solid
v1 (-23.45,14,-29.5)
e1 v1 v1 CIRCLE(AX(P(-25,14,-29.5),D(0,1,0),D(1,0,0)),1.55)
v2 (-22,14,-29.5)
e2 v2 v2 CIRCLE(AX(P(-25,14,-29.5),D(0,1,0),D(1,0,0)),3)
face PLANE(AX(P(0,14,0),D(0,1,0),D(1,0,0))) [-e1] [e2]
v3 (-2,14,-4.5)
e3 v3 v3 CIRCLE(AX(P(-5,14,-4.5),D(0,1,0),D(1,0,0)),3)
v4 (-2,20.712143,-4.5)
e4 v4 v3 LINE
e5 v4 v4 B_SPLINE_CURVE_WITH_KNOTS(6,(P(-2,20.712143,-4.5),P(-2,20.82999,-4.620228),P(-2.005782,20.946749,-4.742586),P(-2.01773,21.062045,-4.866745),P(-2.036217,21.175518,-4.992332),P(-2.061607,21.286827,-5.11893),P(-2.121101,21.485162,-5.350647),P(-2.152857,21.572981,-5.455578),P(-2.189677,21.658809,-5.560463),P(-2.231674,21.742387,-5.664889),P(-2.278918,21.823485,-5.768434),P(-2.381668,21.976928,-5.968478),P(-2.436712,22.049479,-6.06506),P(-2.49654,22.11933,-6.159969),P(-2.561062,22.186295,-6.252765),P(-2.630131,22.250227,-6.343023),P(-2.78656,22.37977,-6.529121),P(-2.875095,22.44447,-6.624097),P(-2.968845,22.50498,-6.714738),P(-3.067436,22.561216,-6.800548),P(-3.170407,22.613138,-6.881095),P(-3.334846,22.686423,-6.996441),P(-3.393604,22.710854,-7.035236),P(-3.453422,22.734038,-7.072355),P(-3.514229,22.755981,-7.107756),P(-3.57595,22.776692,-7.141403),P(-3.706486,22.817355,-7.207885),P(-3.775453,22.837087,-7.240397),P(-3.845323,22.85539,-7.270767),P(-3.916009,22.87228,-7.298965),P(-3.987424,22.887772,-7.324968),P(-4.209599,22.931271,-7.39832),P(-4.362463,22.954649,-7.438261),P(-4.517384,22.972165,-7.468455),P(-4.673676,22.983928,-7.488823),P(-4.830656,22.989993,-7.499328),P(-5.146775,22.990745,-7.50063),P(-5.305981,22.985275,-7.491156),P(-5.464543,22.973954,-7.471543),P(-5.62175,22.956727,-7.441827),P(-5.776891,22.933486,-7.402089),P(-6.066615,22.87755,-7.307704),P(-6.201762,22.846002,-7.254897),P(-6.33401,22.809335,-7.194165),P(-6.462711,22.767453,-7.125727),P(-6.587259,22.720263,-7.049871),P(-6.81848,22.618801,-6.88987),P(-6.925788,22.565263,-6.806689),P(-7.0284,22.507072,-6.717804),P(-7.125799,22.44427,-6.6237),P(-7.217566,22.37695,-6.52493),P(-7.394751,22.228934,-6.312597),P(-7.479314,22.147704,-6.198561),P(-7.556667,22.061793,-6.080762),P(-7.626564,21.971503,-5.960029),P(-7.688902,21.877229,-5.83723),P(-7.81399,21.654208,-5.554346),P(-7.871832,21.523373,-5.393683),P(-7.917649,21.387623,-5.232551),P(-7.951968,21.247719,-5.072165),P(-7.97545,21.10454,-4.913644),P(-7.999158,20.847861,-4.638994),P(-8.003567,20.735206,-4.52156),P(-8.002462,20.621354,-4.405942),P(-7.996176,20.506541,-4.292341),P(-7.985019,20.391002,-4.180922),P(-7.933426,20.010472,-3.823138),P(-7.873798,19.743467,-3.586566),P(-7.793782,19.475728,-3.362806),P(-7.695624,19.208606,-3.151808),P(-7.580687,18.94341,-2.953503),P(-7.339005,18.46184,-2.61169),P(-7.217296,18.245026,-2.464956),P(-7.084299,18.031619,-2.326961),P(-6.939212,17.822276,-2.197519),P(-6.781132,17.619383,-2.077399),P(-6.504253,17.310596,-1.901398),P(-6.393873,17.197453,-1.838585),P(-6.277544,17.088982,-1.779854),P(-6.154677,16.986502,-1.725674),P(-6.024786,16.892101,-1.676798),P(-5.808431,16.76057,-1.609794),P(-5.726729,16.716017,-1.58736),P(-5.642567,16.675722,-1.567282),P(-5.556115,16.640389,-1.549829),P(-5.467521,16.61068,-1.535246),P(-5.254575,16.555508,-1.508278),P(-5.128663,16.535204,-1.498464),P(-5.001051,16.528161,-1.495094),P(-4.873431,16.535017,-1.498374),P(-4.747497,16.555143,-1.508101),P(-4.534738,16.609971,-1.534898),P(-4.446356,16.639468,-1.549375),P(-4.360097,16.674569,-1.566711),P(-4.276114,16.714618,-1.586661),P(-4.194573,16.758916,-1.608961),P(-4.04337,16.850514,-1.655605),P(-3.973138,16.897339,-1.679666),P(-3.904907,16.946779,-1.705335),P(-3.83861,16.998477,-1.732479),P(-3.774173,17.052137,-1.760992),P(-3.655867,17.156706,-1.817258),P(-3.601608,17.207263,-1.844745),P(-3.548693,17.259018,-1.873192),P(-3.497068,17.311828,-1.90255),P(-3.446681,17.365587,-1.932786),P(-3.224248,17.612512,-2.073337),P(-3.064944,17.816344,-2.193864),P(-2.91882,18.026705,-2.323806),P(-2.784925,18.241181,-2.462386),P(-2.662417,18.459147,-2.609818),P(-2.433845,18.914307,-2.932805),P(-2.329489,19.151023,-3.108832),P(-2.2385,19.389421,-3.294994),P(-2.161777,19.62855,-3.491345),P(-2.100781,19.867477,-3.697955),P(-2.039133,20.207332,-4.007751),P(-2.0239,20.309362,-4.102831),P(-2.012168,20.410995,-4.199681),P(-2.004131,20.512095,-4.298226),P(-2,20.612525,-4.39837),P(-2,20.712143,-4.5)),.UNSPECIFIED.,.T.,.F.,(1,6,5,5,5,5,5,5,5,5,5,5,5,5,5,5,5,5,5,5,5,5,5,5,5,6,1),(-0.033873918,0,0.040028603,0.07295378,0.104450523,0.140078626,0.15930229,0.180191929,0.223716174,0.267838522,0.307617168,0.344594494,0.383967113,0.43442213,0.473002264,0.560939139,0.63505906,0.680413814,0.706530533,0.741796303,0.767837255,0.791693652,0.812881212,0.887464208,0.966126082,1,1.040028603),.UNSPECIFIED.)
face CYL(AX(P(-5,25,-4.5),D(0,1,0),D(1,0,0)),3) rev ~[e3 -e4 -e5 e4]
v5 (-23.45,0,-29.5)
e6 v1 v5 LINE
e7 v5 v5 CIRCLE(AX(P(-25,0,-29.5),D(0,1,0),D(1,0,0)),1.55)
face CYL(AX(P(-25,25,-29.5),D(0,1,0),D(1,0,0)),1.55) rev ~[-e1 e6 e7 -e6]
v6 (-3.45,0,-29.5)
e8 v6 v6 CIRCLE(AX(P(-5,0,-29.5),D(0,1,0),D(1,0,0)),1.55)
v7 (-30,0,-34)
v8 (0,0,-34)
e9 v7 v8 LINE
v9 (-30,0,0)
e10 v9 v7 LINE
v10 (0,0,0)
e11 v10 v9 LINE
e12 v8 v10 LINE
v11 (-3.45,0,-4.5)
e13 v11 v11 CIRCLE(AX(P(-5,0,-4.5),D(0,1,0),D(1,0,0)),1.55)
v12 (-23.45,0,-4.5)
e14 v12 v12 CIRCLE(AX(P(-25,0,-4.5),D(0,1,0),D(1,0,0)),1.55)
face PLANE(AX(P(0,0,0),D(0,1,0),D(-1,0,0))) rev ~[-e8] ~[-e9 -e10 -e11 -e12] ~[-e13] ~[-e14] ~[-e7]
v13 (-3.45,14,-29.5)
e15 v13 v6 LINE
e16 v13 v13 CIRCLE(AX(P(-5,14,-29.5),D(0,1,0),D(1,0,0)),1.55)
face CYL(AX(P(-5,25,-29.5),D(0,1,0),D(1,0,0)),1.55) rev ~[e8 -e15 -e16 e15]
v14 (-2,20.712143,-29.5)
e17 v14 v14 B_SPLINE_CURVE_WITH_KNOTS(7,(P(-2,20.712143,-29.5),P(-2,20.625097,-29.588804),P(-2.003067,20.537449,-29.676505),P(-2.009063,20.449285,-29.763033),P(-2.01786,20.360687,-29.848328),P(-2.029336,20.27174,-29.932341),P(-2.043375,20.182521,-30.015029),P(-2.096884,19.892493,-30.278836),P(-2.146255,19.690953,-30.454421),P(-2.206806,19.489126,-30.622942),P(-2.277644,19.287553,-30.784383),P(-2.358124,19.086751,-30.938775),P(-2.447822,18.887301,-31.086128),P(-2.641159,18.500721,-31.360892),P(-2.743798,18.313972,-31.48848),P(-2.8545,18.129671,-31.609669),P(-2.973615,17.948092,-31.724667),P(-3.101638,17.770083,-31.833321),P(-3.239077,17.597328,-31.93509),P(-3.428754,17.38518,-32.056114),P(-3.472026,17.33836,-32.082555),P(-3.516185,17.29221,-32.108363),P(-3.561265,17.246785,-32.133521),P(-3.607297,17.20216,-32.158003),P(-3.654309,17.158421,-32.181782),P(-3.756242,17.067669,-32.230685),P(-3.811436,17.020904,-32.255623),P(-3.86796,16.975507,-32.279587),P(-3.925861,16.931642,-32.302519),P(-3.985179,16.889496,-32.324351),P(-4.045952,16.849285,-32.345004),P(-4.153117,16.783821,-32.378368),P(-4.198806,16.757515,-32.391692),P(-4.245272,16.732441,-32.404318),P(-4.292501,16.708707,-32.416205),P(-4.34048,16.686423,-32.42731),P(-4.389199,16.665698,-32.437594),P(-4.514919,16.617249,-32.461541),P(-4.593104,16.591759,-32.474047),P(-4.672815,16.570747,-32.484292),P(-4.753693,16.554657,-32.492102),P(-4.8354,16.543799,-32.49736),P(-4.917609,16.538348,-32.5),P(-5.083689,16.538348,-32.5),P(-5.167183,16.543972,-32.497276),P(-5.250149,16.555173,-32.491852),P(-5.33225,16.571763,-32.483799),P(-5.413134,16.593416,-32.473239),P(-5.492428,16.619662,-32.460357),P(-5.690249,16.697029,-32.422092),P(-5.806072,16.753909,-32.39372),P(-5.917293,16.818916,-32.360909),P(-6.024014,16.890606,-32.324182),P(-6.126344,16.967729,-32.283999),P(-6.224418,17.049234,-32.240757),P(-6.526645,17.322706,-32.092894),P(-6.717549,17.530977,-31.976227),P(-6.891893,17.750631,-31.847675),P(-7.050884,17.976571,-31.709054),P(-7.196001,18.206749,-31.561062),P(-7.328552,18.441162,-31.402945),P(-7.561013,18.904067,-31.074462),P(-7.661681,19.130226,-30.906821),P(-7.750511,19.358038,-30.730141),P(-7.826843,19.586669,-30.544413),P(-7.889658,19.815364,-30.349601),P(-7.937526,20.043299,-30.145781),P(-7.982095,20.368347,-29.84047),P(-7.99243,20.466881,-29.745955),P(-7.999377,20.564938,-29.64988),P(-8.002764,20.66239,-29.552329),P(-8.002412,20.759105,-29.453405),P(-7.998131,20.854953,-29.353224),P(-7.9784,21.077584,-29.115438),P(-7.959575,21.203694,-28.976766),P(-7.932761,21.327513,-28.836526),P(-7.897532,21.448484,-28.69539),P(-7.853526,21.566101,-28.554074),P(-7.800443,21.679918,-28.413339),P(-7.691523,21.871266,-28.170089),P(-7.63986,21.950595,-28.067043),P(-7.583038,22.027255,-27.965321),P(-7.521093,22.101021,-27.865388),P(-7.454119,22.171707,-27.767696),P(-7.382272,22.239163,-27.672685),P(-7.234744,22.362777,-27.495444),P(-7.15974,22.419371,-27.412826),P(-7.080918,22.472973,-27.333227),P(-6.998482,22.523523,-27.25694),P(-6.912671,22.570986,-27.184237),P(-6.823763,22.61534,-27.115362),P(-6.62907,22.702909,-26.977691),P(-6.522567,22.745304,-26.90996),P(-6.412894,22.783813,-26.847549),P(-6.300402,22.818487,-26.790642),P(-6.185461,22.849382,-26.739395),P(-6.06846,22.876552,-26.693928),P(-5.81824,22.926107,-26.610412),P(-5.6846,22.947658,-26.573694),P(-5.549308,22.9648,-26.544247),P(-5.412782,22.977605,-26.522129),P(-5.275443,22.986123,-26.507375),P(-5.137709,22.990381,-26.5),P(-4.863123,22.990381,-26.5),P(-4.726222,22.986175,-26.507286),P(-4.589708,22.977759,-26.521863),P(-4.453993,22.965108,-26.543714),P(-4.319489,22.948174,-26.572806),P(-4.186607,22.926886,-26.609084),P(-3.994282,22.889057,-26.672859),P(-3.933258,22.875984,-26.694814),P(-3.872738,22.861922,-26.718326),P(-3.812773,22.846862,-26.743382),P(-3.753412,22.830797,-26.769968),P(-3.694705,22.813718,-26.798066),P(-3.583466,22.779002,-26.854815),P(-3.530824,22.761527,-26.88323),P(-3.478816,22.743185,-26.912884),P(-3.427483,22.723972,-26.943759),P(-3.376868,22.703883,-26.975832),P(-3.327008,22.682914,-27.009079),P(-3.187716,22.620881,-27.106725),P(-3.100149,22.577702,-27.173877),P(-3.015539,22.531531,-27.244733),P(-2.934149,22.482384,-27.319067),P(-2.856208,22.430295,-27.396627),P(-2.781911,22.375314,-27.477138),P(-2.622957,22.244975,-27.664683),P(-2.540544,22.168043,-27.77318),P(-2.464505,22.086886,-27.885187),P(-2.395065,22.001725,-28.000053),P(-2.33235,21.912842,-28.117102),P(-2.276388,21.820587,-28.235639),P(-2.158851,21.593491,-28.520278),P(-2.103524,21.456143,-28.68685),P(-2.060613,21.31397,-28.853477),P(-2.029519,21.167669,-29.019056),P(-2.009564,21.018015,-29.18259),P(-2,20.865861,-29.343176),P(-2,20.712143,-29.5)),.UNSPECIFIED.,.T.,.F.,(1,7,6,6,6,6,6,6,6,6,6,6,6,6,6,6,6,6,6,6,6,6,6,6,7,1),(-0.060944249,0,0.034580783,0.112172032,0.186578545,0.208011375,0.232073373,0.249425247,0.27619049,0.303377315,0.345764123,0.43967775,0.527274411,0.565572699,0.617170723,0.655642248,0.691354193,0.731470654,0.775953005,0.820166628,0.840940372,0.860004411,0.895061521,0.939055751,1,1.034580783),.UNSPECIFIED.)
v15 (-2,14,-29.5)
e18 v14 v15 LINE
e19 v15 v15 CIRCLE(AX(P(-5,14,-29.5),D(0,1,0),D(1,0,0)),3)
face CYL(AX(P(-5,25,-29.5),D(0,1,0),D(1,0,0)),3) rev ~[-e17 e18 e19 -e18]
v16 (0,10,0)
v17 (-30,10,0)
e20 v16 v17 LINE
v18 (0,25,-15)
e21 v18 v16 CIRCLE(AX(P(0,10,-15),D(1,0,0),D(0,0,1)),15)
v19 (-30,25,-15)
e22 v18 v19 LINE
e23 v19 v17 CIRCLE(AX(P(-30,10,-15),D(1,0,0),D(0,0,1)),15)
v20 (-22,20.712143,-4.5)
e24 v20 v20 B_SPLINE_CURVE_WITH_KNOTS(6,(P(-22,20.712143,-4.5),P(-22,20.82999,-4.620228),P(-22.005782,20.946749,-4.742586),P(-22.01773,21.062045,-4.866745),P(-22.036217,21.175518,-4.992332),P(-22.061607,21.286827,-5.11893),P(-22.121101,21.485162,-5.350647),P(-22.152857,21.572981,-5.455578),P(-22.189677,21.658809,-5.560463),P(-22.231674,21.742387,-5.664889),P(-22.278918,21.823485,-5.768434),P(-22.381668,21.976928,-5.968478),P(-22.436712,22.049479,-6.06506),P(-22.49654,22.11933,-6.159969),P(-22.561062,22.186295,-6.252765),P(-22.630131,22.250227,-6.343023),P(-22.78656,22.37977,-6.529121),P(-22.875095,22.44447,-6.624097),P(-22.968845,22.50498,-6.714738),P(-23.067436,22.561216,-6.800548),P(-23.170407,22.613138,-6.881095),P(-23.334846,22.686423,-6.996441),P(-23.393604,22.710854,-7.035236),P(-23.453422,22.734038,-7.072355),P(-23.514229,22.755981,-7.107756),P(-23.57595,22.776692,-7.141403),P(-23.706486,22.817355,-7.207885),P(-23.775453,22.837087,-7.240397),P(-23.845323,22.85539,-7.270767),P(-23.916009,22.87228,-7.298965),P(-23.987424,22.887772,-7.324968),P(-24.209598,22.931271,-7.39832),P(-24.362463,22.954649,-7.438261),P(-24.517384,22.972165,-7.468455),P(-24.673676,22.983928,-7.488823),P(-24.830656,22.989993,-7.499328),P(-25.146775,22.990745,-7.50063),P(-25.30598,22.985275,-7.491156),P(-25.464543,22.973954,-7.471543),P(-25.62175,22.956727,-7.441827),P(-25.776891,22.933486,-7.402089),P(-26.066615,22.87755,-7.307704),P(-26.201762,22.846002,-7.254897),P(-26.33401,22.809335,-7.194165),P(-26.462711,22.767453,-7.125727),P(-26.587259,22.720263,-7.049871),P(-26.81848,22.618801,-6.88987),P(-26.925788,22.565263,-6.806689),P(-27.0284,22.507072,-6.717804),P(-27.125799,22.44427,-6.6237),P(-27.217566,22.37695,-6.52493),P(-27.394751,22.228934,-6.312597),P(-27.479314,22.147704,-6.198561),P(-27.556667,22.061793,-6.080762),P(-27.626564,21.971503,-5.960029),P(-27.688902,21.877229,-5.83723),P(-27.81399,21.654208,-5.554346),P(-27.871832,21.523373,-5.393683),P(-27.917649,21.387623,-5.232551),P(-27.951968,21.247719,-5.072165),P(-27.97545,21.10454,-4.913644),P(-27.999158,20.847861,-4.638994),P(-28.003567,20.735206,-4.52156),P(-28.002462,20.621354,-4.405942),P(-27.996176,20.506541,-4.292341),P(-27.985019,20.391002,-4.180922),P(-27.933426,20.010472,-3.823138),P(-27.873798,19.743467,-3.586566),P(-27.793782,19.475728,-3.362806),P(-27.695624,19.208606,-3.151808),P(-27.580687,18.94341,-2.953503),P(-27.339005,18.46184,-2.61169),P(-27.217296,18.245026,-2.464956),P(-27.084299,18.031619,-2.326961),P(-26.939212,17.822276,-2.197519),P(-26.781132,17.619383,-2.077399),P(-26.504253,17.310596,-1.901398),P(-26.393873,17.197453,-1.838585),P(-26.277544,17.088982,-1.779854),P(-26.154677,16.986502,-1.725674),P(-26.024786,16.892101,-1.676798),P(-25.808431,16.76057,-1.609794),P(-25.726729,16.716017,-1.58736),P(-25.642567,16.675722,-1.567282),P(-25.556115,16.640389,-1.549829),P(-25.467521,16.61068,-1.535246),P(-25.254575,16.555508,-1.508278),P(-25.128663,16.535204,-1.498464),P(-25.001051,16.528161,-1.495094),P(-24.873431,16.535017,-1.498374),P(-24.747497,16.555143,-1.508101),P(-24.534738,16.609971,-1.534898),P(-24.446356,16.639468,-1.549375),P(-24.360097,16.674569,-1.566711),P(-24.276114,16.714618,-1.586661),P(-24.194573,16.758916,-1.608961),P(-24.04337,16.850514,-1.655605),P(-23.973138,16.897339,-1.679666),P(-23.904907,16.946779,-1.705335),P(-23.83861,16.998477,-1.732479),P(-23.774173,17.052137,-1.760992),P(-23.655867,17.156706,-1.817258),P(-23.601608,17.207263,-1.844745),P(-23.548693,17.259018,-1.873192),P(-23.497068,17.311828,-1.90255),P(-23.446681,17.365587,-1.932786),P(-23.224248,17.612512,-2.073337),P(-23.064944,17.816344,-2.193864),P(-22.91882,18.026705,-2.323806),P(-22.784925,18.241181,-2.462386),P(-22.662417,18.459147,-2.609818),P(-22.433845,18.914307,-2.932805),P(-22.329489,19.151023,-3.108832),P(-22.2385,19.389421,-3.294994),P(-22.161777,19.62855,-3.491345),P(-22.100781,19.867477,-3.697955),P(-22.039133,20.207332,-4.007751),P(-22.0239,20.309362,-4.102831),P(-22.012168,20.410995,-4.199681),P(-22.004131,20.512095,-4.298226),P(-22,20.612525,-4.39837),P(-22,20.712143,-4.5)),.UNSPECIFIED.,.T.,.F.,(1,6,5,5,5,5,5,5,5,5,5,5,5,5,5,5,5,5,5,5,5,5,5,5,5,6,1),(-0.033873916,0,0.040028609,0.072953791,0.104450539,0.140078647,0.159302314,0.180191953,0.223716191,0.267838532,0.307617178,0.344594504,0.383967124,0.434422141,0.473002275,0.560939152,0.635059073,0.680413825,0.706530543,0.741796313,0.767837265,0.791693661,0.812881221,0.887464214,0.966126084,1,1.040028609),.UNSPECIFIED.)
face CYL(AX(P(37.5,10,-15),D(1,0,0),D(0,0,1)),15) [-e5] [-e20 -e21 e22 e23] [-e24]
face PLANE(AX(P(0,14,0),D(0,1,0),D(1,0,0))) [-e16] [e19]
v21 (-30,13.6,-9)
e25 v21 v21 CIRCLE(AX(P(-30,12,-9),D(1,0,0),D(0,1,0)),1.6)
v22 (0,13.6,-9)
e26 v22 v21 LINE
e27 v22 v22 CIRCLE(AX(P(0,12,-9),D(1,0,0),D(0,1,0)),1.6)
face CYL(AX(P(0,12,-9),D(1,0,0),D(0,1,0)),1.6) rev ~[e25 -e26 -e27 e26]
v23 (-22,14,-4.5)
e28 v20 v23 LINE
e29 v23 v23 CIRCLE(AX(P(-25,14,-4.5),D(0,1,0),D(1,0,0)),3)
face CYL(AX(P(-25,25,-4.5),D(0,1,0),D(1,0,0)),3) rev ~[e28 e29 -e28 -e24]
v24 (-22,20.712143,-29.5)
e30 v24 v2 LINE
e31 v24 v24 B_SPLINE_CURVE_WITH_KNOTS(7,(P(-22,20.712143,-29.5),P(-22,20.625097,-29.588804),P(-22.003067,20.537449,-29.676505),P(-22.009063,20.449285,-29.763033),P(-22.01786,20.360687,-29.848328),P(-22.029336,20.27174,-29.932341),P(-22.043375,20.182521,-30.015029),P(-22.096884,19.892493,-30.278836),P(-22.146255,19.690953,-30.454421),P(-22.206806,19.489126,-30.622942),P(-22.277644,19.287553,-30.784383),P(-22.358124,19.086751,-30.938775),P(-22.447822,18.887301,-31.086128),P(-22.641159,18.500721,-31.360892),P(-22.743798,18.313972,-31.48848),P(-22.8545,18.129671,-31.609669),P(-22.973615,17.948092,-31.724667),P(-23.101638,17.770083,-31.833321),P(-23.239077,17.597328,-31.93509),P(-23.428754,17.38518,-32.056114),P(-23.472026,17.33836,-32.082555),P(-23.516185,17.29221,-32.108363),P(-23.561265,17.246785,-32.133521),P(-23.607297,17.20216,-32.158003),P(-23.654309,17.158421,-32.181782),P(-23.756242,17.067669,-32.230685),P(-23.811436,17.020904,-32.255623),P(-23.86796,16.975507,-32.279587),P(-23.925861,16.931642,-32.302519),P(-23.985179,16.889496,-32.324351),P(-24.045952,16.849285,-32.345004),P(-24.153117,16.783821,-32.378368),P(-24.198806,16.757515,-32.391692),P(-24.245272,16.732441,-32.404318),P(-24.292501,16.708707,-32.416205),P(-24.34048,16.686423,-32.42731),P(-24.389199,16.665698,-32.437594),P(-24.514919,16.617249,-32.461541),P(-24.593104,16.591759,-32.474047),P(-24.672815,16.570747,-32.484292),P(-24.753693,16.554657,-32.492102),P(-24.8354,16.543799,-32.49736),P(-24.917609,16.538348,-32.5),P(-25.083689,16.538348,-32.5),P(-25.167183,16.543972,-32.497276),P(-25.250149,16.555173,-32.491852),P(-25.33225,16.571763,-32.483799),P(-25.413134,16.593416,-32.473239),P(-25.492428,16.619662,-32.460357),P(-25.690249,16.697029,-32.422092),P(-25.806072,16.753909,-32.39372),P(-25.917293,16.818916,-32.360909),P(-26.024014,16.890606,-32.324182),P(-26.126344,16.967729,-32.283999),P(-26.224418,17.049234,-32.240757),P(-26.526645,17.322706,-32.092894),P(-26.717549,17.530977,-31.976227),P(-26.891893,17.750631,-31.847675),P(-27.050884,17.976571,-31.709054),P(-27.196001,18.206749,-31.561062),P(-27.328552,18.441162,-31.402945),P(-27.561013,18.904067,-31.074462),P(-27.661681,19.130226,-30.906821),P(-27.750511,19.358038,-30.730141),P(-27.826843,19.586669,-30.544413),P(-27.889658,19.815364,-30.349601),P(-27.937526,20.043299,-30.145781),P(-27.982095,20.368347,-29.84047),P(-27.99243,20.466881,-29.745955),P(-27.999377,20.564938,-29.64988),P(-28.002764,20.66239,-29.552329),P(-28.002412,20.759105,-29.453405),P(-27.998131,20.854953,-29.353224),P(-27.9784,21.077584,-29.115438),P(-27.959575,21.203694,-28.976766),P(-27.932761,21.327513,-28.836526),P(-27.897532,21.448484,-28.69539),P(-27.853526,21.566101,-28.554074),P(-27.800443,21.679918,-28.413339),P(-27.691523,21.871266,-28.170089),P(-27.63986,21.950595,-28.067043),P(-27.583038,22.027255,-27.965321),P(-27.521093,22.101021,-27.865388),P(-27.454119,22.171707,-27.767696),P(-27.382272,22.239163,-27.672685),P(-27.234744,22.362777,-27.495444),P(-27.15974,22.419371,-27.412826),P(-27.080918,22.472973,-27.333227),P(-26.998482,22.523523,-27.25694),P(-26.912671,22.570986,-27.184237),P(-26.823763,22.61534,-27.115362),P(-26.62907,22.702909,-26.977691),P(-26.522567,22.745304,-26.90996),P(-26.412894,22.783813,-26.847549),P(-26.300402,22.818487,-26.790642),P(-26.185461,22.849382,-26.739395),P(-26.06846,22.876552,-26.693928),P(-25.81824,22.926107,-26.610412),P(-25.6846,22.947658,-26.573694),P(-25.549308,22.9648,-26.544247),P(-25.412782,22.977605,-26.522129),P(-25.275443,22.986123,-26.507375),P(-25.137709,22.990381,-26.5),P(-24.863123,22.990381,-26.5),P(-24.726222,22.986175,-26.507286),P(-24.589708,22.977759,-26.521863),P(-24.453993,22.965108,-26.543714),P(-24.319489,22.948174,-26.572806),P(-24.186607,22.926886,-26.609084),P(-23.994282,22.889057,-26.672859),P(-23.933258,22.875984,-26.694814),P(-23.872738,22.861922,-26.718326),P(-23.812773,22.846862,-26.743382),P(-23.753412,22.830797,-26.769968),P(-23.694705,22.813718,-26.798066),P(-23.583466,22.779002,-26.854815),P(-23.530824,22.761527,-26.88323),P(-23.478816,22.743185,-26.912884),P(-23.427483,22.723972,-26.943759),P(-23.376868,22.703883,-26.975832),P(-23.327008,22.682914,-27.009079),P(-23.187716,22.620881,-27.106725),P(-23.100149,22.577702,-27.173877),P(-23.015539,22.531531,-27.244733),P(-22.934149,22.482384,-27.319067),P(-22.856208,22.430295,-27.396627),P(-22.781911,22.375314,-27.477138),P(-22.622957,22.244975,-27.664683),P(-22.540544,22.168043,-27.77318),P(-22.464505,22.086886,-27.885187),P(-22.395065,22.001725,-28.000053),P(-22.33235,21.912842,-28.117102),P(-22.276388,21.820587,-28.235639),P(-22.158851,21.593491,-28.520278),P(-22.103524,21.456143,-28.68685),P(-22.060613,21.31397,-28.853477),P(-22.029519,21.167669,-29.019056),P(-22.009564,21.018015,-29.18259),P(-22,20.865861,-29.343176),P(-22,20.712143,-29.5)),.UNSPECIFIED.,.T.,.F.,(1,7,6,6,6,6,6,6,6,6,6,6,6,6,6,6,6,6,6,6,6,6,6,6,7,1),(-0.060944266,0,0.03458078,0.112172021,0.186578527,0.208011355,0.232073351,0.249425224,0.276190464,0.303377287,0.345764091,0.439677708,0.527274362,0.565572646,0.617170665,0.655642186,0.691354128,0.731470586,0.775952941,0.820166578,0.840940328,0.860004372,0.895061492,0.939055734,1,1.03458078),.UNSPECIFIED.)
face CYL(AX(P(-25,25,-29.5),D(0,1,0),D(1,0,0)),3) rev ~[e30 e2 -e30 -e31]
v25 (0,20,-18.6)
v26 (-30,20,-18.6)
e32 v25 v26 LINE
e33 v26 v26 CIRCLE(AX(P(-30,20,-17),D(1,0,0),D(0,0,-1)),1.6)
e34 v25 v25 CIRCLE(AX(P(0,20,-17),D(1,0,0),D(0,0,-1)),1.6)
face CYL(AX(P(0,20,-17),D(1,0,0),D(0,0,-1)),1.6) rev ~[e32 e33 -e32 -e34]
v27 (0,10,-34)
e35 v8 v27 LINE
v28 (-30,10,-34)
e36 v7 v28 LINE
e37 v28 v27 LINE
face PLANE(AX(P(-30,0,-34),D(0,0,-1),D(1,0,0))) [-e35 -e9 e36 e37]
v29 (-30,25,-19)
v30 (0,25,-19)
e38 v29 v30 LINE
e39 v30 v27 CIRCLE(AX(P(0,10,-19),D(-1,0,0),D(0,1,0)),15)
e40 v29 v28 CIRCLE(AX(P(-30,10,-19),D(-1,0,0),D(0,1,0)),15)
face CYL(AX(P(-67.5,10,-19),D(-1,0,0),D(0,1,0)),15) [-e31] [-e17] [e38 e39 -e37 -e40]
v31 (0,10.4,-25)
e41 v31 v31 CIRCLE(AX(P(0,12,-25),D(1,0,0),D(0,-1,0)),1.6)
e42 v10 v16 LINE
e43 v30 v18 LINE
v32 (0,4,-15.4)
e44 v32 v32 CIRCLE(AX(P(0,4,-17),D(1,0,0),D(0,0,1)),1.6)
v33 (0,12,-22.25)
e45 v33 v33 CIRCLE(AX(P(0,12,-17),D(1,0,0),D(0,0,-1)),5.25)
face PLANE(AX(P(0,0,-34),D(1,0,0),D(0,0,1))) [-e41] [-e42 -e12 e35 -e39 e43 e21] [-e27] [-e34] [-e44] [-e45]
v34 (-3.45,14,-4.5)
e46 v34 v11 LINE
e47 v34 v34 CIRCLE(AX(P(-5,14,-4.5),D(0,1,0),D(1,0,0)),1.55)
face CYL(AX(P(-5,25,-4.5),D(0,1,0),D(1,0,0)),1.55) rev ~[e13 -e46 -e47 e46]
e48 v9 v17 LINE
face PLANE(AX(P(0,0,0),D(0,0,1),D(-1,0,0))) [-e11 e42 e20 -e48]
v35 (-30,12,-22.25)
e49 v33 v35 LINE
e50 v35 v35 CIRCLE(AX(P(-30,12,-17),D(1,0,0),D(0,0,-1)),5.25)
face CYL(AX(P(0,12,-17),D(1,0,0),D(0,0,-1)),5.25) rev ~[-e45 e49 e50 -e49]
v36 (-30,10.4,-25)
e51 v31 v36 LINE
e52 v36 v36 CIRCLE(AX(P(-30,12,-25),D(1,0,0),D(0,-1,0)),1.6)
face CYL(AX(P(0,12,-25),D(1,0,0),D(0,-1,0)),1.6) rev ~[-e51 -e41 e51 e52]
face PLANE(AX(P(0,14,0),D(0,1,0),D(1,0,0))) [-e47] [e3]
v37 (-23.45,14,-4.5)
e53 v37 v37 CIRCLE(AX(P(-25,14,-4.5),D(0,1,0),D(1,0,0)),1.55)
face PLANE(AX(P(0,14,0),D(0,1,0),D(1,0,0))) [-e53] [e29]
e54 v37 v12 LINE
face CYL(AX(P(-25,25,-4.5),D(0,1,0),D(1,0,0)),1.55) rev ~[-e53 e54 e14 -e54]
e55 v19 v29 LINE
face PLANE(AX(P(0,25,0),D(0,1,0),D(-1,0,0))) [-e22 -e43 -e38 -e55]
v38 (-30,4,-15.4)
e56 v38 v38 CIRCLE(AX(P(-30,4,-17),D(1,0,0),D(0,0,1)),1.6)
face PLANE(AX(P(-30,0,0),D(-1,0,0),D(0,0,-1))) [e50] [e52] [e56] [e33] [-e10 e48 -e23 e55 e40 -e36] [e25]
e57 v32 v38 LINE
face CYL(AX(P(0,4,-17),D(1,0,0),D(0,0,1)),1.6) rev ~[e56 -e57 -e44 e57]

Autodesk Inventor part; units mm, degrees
ref_plane "YZ Plane" through (0, 0, 0) normal (1, 0, 0) x (0, 1, 0)
ref_plane "XZ Plane" through (0, 0, 0) normal (0, 1, 0) x (-1, 0, 0)
ref_plane "XY Plane" through (0, 0, 0) normal (0, 0, 1) x (1, 0, 0)
sketch "Sketch1" plane through (0, 0, 0) normal (0, 1, 0) x (-1, 0, 0)
  line L0 (0, 0) -> (30, 0)
  line L1 (30, 0) -> (30, -34)
  line L2 (30, -34) -> (0, -34)
  line L3 (0, -34) -> (0, 0)
  dimension "d0" = 30
  dimension "d1" = 34
extrude "Extrusion1" add sketch "Sketch1" along normal blind 25
sketch "Sketch2" plane through (0, 0, 0) normal (1, 0, 0) x (0, 0, -1)
  line L0 (34, 0) -> (0, 0) projected
  line L1 (17, 0) -> (17, 25) construction
  line L2 (34, 25) -> (0, 25) projected
  circle A0 centre (17, 12) radius 5.25
  circle A1 centre (17, 12) radius 10.2956 construction
  dimension "d4" = 10.5
  dimension "d5" = 12
extrude "Extrusion2" cut sketch "Sketch2" against normal blind 30
sketch "Sketch3" plane through (0, 0, 0) normal (1, 0, 0) x (0, 0, -1)
  circle A0 centre (17, 12) radius 5.25 projected
  circle A1 centre (17, 12) radius 8 construction
  circle A2 centre (17, 20) radius 1.6
  point P0 (0, 0)
  dimension "d8" = 16
  dimension "d9" = 3.2
extrude "Extrusion3" cut sketch "Sketch3" against normal blind 30 contours A2
pattern_circular "Circular Pattern1" count 4 over 360 about axis through (0, 12, -17) along (-1, 0, 0) of "Extrusion3"
sketch "Sketch4" plane through (0, 25, 0) normal (0, 1, 0) x (1, 0, 0)
  line L0 (0, 0) -> (0, 34) projected
  line L1 (0, 17) -> (-30, 17) construction
  line L2 (-30, 34) -> (-30, 0) projected
  line L3 (-5, 4.5) -> (-25, 4.5) construction
  line L4 (-25, 4.5) -> (-25, 29.5) construction
  line L5 (-25, 29.5) -> (-5, 29.5) construction
  line L6 (-5, 29.5) -> (-5, 4.5) construction
  line L7 (-5, 4.5) -> (-25, 29.5) construction
  line L8 (-25, 4.5) -> (-5, 29.5) construction
  circle A0 centre (-25, 4.5) radius 1.55
  circle A1 centre (-25, 29.5) radius 1.55
  circle A2 centre (-5, 29.5) radius 1.55
  circle A3 centre (-5, 4.5) radius 1.55
  point P0 (-15, 17)
  dimension "d15" = 20
  dimension "d16" = 25
  dimension "d17" = 3.1
  dimension "d18" = 3.1
  dimension "d19" = 3.1
  dimension "d20" = 3.1
extrude "Extrusion4" cut sketch "Sketch4" against normal blind 30
fillet "Fillet2" radius 15 2 edges at (-15, 25, -34) (-15, 25, 0)
sketch "Sketch7" plane through (0, 25, 0) normal (0, 1, 0) x (1, 0, 0)
  circle A0 centre (-25, 4.5) radius 1.55 projected
  circle A1 centre (-25, 4.5) radius 3
  circle A2 centre (-25, 29.5) radius 1.55 projected
  circle A3 centre (-25, 29.5) radius 3
  circle A4 centre (-5, 29.5) radius 1.55 projected
  circle A5 centre (-5, 29.5) radius 3
  circle A6 centre (-5, 4.5) radius 1.55 projected
  circle A7 centre (-5, 4.5) radius 3
  point P0 (0, 0)
  dimension "d46" = 6
  dimension "d47" = 6
  dimension "d48" = 6
  dimension "d49" = 6
extrude "Extrusion7" cut sketch "Sketch7" against normal blind 11 contours A0 | A1 | A2 | A3 | A4 | A5 | A6 | A7
properties part number "Nut holder"
